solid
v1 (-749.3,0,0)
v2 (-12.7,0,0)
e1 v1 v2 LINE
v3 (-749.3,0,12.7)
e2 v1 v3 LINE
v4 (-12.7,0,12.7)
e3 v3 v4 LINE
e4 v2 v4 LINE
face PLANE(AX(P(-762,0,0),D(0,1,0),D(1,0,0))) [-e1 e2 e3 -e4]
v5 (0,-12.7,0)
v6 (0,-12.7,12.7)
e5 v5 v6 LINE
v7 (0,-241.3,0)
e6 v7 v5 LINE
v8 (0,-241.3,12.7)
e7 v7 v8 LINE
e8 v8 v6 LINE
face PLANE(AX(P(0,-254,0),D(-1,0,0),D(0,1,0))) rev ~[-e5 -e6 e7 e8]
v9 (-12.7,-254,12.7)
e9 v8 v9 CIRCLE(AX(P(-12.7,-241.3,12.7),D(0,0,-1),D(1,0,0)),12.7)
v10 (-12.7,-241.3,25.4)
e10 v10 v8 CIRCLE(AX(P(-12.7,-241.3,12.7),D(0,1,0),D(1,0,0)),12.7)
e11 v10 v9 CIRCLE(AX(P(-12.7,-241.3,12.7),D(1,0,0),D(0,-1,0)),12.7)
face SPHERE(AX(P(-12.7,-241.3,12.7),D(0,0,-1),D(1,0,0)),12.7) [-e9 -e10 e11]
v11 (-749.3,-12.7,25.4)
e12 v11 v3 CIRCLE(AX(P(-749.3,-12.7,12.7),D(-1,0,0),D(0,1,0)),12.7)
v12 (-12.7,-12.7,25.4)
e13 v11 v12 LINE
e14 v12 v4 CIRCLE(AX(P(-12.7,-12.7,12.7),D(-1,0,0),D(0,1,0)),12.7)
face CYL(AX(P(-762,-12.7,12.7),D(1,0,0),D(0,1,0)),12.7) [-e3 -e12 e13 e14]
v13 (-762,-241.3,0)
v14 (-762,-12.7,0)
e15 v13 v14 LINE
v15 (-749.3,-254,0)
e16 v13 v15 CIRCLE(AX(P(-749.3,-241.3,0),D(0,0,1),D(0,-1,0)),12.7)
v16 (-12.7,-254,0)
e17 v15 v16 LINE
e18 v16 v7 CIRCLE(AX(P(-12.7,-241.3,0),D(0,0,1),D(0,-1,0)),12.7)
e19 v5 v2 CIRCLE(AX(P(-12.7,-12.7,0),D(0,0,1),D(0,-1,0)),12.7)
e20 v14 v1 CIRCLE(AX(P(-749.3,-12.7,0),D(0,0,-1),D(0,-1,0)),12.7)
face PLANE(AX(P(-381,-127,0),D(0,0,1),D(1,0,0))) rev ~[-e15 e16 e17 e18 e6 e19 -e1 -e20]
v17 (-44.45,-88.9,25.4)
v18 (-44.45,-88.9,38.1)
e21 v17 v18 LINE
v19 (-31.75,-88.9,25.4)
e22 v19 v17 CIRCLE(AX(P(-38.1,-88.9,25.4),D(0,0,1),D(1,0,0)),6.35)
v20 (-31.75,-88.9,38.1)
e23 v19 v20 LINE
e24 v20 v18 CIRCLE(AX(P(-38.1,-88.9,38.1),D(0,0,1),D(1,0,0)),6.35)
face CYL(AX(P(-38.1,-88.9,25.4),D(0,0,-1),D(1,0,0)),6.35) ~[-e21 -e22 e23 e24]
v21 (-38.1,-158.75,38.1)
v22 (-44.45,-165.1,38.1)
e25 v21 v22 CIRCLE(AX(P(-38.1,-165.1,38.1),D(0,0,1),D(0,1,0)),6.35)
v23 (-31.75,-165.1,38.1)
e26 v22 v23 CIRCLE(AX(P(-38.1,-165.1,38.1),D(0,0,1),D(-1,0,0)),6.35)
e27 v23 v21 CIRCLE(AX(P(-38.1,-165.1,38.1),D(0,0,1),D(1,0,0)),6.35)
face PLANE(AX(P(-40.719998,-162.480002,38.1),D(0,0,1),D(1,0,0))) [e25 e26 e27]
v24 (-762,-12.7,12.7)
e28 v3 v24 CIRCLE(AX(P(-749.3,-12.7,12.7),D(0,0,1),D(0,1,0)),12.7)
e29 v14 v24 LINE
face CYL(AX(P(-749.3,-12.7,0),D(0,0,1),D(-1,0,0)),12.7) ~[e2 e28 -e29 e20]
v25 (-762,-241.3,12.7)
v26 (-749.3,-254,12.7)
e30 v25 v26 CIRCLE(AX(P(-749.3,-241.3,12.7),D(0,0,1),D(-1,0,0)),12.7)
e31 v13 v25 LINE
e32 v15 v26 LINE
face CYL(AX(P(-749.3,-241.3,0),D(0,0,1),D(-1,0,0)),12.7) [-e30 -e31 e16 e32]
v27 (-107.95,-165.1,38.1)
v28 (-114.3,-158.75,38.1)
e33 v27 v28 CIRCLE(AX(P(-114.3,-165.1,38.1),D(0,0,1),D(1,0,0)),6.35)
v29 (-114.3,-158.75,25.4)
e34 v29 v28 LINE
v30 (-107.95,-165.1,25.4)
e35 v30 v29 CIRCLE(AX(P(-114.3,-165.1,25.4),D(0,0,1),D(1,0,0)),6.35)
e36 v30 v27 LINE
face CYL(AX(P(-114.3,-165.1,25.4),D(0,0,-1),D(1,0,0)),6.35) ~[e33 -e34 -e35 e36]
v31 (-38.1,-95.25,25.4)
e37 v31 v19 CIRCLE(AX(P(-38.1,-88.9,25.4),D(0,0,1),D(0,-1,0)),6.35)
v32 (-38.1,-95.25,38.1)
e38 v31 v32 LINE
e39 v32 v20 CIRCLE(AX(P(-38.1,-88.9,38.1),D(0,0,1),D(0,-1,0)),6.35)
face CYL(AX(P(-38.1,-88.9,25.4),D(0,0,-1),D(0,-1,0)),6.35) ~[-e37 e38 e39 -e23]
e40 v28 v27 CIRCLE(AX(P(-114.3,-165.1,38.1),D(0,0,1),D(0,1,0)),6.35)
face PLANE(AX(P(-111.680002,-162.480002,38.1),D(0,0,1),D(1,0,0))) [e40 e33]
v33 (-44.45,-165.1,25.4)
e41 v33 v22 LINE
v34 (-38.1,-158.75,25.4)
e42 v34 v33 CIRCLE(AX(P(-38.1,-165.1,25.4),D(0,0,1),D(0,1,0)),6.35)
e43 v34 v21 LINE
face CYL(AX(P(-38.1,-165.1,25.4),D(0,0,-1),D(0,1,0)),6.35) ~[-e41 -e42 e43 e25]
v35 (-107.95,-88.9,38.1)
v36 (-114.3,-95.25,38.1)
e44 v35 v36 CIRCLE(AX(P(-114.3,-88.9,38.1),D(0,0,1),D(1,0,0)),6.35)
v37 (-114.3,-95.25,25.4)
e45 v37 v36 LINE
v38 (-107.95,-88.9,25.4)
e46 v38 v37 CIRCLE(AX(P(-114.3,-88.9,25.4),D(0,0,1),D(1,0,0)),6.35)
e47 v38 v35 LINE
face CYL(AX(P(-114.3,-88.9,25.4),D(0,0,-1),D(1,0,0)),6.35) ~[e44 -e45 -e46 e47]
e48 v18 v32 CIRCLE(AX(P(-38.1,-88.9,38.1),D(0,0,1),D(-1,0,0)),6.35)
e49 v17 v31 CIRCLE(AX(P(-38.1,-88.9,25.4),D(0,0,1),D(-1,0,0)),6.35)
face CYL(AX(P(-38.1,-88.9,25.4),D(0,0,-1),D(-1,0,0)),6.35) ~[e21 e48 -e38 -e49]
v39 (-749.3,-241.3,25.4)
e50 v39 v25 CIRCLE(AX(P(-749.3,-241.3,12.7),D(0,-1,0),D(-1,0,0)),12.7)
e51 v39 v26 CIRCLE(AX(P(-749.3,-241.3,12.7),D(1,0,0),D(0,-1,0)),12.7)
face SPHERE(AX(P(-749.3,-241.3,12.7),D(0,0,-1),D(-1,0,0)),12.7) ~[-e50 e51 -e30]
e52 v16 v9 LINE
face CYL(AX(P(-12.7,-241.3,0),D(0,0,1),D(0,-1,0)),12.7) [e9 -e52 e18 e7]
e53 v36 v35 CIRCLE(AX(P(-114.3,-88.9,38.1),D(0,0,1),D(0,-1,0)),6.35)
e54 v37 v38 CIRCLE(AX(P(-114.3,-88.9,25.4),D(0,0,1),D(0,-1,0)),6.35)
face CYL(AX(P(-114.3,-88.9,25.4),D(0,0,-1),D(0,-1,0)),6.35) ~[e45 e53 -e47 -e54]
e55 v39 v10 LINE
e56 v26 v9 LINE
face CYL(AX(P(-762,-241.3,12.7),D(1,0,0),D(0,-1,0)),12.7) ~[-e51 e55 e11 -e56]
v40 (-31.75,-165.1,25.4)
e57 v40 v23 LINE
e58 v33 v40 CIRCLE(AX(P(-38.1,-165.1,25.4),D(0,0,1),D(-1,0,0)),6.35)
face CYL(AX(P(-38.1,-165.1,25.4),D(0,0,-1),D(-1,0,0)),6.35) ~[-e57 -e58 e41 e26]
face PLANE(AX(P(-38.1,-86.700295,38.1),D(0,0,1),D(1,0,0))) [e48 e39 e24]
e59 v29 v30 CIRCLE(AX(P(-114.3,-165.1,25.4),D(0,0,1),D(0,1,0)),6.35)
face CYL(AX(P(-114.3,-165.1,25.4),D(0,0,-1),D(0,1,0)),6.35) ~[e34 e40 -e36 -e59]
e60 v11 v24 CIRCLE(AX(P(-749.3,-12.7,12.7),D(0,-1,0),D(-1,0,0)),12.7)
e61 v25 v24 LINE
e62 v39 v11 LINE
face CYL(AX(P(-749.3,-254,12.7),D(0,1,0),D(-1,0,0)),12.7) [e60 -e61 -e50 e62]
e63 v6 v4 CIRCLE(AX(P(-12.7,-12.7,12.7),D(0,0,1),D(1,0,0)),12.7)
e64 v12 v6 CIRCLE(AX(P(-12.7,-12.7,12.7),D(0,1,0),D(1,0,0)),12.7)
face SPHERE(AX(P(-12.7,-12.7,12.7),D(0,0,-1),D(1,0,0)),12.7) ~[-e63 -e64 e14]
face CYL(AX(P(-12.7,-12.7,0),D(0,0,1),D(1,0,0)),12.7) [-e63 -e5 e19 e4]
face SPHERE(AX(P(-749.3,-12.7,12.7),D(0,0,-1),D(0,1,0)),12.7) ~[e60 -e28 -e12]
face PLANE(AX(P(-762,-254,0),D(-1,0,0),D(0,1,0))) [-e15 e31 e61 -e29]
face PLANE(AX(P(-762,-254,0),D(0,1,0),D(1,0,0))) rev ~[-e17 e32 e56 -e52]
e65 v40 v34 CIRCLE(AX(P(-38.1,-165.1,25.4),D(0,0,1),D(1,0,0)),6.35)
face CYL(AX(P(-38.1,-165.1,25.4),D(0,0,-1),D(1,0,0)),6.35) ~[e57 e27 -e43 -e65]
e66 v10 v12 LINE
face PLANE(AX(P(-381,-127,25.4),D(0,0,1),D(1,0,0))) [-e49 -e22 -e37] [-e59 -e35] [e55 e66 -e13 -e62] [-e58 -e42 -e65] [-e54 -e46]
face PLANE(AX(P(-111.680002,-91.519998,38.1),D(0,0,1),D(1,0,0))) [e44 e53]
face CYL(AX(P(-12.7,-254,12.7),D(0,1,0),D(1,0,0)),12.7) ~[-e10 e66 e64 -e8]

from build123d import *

# Parameters (mm, degrees)
F0_W     = 762
F0_H     = 254
F1_DEPTH = 25.4
F3_R     = 12.7
F5_DEPTH = 12.7


# Not quite as in the source:
# - a feature of the source that left no trace in its solid (it failed there, or was rolled back) is left out


with BuildPart() as f1:
    # F0 (on Top) → F1 (new body)
    with BuildSketch(Plane.XY):
        with Locations((-381, -127)):
            Rectangle(F0_W, F0_H)
    extrude(amount=F1_DEPTH)

    # F3
    f3_edges = [f1.edges().sort_by_distance(p)[0] for p in [
        (-762, -254, 12.7),
        (0, -254, 12.7),
        (0, 0, 12.7),
        (0, -127, 25.4),
        (-762, 0, 12.7),
        (-381, 0, 25.4),
        (-762, -127, 25.4),
        (-381, -254, 25.4),
    ]]
    fillet(f3_edges, radius=F3_R)

    # F4 (on face) → F5 (join)
    with BuildSketch(Plane.XY.offset(25.4)):
        with BuildLine():
            Line((-44.45, -165.1), (-38.1, -165.1))
            Line((-38.1, -165.1), (-38.1, -158.75))
            ThreePointArc((-38.1, -158.75), (-42.5901280605, -160.6098719395), (-44.45, -165.1))
        make_face()
        with BuildLine():
            ThreePointArc((-44.45, -165.1), (-38.1, -171.45), (-31.75, -165.1))
            Line((-31.75, -165.1), (-38.1, -165.1))
            Line((-38.1, -165.1), (-44.45, -165.1))
        make_face()
        with BuildLine():
            Line((-38.1, -165.1), (-31.75, -165.1))
            ThreePointArc((-31.75, -165.1), (-33.6098719395, -160.6098719395), (-38.1, -158.75))
            Line((-38.1, -158.75), (-38.1, -165.1))
        make_face()
        with BuildLine():
            Line((-114.3, -165.1), (-107.95, -165.1))
            ThreePointArc((-107.95, -165.1), (-109.8098719395, -160.6098719395), (-114.3, -158.75))
            Line((-114.3, -158.75), (-114.3, -165.1))
        make_face()
        with BuildLine():
            ThreePointArc((-114.3, -158.75), (-118.7901280605, -169.5901280605), (-107.95, -165.1))
            Line((-107.95, -165.1), (-114.3, -165.1))
            Line((-114.3, -165.1), (-114.3, -158.75))
        make_face()
        with BuildLine():
            ThreePointArc((-114.3, -95.25), (-109.8098719395, -93.3901280605), (-107.95, -88.9))
            Line((-107.95, -88.9), (-114.3, -88.9))
            Line((-114.3, -88.9), (-114.3, -95.25))
        make_face()
        with BuildLine():
            Line((-114.3, -88.9), (-107.95, -88.9))
            ThreePointArc((-107.95, -88.9), (-118.7901280605, -84.4098719395), (-114.3, -95.25))
            Line((-114.3, -95.25), (-114.3, -88.9))
        make_face()
        with BuildLine():
            Line((-38.1, -88.9), (-31.75, -88.9))
            ThreePointArc((-31.75, -88.9), (-38.1, -82.55), (-44.45, -88.9))
            Line((-44.45, -88.9), (-38.1, -88.9))
        make_face()
        with BuildLine():
            Line((-38.1, -95.25), (-38.1, -88.9))
            Line((-38.1, -88.9), (-44.45, -88.9))
            ThreePointArc((-44.45, -88.9), (-42.5901280605, -93.3901280605), (-38.1, -95.25))
        make_face()
        with BuildLine():
            ThreePointArc((-38.1, -95.25), (-33.6098719395, -93.3901280605), (-31.75, -88.9))
            Line((-31.75, -88.9), (-38.1, -88.9))
            Line((-38.1, -88.9), (-38.1, -95.25))
        make_face()
    extrude(amount=F5_DEPTH)


solid = f1.part
